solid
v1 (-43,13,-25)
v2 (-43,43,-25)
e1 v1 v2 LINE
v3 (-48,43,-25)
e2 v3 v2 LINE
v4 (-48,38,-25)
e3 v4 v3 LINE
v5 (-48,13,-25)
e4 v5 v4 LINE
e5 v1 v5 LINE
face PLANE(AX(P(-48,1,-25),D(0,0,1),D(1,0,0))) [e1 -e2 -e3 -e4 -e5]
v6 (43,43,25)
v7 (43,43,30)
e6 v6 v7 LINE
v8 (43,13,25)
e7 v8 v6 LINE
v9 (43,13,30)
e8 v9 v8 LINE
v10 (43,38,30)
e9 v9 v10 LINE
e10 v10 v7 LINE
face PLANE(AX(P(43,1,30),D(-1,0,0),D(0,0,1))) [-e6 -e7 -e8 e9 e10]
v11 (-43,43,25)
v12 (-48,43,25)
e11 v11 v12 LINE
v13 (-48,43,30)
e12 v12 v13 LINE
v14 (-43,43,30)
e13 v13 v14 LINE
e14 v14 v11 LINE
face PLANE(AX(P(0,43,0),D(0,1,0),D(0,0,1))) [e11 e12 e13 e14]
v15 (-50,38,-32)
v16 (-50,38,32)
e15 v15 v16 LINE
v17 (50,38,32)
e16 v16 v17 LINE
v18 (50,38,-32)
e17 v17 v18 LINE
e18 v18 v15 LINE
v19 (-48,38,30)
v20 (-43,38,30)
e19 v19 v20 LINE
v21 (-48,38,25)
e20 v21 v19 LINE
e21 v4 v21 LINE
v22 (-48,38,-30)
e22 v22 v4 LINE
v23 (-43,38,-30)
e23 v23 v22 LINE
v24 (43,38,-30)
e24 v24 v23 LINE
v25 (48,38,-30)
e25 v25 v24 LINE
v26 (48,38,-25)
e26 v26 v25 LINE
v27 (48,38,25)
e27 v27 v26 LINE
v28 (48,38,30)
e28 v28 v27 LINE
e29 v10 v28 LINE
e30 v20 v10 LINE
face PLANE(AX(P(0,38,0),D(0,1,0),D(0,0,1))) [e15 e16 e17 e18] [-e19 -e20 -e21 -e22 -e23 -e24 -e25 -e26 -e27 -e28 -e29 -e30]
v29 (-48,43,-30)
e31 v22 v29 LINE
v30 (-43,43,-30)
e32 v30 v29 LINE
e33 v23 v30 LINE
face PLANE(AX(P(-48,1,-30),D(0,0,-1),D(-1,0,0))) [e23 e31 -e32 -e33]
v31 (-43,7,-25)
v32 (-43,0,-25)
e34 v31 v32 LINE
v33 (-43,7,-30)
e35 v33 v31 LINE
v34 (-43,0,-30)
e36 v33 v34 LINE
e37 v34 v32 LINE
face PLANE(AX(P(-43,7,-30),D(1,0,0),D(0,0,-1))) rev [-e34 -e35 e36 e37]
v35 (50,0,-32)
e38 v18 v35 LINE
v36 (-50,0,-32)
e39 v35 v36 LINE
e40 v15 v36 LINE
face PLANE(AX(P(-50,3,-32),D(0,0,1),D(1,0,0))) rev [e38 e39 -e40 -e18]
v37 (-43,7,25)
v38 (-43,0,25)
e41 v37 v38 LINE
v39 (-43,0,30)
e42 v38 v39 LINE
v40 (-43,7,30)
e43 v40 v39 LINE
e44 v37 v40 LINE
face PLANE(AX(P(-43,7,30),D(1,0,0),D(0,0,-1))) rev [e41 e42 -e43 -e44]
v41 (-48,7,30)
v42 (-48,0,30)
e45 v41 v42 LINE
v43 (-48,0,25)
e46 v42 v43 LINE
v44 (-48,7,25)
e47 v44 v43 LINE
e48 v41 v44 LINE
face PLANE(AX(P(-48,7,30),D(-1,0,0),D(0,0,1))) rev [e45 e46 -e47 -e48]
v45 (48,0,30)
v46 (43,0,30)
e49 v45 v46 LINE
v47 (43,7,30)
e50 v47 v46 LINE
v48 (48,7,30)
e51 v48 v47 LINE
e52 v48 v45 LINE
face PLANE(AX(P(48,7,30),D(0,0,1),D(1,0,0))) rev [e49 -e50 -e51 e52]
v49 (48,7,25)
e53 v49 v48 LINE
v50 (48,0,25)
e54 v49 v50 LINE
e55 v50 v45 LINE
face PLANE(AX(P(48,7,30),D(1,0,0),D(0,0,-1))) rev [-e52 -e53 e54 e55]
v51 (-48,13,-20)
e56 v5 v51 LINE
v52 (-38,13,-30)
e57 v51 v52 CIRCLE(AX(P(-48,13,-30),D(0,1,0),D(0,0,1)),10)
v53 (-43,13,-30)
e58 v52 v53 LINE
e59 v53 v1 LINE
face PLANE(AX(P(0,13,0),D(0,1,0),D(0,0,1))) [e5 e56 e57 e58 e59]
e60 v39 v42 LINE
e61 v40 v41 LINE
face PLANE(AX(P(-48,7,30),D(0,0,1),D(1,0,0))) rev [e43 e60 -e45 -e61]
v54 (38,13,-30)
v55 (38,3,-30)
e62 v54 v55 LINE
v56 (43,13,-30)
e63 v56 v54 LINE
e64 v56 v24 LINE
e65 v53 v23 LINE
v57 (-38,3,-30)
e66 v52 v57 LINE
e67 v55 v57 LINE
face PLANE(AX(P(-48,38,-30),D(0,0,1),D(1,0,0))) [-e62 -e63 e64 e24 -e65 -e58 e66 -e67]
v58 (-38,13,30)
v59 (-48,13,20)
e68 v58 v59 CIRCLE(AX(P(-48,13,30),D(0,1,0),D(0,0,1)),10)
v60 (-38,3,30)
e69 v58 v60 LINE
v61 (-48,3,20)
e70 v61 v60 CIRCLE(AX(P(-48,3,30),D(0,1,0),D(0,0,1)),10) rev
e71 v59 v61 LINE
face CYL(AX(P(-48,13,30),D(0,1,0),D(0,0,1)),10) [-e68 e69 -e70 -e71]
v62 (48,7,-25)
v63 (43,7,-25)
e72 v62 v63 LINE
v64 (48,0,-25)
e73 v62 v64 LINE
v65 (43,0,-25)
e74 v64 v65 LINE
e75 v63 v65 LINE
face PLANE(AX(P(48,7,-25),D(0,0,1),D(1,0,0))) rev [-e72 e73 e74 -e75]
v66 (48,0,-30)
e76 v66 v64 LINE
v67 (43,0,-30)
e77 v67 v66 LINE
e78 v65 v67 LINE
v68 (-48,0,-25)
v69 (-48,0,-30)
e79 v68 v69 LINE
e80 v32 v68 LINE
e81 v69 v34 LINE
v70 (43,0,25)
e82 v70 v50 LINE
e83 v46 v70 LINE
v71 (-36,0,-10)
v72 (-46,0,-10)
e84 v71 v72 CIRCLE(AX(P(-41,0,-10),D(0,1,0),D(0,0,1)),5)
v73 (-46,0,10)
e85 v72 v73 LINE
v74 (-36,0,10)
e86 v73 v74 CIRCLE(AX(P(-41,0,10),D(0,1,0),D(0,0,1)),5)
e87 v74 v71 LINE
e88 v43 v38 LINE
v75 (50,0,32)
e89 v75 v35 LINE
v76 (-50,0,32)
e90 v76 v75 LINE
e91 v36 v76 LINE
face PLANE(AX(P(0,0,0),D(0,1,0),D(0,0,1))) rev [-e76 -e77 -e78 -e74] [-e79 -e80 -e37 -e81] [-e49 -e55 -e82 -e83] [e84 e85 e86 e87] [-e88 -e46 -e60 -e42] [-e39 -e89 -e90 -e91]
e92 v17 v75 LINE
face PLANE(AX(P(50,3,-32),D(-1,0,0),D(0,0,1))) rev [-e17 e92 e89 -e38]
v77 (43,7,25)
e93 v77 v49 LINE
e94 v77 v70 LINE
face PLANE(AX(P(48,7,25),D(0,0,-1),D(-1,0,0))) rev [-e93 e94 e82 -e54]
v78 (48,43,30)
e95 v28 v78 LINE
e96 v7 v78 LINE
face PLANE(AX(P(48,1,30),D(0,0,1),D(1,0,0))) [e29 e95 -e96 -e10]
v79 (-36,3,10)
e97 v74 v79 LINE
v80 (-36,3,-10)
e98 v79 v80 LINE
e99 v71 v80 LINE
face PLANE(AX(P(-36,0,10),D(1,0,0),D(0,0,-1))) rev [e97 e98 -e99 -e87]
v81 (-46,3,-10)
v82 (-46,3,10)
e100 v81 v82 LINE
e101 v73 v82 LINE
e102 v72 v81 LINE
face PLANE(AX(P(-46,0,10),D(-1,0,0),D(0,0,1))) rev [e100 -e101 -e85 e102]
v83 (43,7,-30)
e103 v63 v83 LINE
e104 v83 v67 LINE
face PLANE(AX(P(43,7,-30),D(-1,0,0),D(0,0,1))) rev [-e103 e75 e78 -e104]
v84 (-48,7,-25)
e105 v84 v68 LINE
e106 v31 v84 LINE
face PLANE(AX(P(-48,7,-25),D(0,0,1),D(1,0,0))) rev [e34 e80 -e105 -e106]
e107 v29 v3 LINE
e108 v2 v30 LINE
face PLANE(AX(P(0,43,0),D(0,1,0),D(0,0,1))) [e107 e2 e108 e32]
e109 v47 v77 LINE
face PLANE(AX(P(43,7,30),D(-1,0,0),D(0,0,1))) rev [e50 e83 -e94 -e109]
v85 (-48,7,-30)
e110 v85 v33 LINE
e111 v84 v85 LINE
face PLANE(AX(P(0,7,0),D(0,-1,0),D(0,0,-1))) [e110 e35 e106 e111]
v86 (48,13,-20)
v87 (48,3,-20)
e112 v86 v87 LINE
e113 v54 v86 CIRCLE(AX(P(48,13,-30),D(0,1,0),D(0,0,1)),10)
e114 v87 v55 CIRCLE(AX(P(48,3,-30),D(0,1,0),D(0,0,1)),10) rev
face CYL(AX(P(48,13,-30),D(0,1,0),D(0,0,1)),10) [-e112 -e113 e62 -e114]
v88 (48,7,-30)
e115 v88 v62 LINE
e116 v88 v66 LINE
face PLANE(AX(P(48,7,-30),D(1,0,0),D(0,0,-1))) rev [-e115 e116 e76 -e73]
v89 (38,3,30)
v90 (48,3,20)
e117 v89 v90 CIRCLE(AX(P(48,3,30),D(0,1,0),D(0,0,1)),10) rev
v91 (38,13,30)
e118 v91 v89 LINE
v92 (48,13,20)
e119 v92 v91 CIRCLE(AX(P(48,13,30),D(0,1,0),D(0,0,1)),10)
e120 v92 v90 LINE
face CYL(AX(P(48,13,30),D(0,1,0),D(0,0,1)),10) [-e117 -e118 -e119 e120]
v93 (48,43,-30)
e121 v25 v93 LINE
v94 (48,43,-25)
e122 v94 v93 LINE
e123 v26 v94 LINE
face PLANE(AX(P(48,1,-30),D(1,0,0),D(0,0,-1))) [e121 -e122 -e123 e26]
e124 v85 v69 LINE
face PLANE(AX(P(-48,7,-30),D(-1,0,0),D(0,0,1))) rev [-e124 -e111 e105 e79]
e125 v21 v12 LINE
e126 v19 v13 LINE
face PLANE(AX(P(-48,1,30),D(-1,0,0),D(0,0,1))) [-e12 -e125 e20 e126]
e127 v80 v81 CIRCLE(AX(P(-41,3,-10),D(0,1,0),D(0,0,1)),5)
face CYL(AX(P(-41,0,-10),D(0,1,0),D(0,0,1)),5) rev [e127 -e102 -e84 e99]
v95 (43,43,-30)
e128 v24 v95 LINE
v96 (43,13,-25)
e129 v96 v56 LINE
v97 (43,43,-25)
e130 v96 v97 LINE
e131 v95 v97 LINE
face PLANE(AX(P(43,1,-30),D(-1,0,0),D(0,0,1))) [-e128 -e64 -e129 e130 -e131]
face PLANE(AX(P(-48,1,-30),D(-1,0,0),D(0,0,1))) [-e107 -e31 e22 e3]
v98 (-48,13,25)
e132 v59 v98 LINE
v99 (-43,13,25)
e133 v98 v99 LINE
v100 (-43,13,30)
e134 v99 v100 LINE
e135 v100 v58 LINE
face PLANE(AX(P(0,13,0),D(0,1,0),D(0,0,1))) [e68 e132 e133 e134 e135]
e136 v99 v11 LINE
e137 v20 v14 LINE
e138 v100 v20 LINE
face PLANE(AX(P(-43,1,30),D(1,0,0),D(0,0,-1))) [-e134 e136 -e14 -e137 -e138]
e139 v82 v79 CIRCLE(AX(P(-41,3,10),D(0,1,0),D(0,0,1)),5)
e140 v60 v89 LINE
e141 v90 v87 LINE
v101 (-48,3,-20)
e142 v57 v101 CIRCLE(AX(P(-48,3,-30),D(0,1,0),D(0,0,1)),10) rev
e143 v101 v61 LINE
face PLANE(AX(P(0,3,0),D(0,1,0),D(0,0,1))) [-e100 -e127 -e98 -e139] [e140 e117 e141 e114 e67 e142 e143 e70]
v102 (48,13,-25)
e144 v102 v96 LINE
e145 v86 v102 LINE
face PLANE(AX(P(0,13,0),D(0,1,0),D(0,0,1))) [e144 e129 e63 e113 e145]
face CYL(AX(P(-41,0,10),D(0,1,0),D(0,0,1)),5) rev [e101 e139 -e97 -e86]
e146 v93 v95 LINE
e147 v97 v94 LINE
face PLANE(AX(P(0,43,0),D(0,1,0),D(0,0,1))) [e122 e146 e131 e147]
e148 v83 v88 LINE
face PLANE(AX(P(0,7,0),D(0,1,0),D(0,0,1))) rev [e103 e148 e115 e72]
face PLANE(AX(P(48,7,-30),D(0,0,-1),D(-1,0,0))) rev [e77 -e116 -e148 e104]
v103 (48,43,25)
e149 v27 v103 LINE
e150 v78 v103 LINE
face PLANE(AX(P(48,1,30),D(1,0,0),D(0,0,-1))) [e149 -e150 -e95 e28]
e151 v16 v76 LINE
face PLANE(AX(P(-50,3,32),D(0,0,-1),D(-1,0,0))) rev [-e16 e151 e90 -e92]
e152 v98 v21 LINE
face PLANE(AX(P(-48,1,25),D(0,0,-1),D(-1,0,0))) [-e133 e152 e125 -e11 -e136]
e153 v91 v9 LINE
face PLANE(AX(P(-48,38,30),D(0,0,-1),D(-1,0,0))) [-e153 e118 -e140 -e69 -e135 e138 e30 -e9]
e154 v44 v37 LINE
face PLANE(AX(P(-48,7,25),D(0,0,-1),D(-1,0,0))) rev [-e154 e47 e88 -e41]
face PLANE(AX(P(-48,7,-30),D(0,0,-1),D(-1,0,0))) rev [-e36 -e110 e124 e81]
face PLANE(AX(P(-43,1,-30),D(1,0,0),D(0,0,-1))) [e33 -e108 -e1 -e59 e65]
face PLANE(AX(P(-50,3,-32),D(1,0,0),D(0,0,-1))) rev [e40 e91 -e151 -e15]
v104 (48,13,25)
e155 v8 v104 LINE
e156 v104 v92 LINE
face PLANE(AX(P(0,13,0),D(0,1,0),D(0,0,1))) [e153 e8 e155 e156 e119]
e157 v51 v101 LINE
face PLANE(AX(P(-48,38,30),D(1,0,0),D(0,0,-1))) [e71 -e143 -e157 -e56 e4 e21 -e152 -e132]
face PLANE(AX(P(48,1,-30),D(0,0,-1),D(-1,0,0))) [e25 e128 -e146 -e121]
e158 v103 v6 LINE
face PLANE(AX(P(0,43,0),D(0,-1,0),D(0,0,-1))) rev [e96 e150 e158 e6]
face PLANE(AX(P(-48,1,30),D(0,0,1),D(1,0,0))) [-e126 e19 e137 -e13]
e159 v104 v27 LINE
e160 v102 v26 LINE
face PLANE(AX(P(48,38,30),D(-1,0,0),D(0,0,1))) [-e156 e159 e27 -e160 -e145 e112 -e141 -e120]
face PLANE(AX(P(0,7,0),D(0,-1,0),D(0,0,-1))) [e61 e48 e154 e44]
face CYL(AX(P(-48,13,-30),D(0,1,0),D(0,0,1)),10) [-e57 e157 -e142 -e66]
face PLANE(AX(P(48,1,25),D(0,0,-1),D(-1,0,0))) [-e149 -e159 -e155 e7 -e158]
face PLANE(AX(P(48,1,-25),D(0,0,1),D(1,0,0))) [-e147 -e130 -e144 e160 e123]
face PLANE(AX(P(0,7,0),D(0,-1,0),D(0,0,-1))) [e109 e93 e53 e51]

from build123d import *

# Parameters (mm, degrees)
SKETCH1_W                = 100
SKETCH1_H                = 64
BOSS_EXTRUDE1_DEPTH      = 3
SKETCH2_W                = 100
SKETCH2_H                = 64
SKETCH2_W_2              = 96
SKETCH2_H_2              = 60
BOSS_EXTRUDE2_DEPTH      = 35
BOSS_EXTRUDE9_DEPTH      = 5
BOSS_EXTRUDE9_DEPTH_BACK = 37
SKETCH12_W               = 5
SKETCH12_H               = 5
CUT_EXTRUDE6_DEPTH       = 72.582120673
BOSS_EXTRUDE11_DEPTH     = 10
SKETCH19_W               = 5
SKETCH19_H               = 5
CUT_EXTRUDE7_DEPTH       = 7
FILLET2_R                = 10


with BuildPart() as part:
    # Sketch1 → Boss-Extrude1 (new body)
    with BuildSketch(Plane(origin=(0, 0, 0), x_dir=(1, 0, 0), z_dir=(0, 1, 0))):
        Rectangle(SKETCH1_W, SKETCH1_H)
    extrude(amount=BOSS_EXTRUDE1_DEPTH)

    # Sketch2 → Boss-Extrude2 (add)
    with BuildSketch(Plane(origin=(0, 3, 0), x_dir=(1, 0, 0), z_dir=(0, 1, 0))):
        Rectangle(SKETCH2_W, SKETCH2_H)
        Rectangle(SKETCH2_W_2, SKETCH2_H_2, mode=Mode.SUBTRACT)
    extrude(amount=BOSS_EXTRUDE2_DEPTH)

    # Sketch12 → Boss-Extrude9 (add, two sides: drawn at the far end of the back side and taken through both)
    with BuildSketch(Plane(origin=(0, 38, 0), x_dir=(1, 0, 0), z_dir=(0, 1, 0)).offset(-BOSS_EXTRUDE9_DEPTH_BACK)):
        with Locations((-45.5, 27.5)):
            Rectangle(SKETCH12_W, SKETCH12_H)
        with Locations((45.5, 27.5)):
            Rectangle(SKETCH12_W, SKETCH12_H)
        with Locations((45.5, -27.5)):
            Rectangle(SKETCH12_W, SKETCH12_H)
        with Locations((-45.5, -27.5)):
            Rectangle(SKETCH12_W, SKETCH12_H)
    extrude(amount=BOSS_EXTRUDE9_DEPTH + BOSS_EXTRUDE9_DEPTH_BACK)

    # Sketch14 → Cut-Extrude6 (cut, through all)
    with BuildSketch(Plane(origin=(0, 3, 0), x_dir=(1, 0, 0), z_dir=(0, 1, 0))):
        with BuildLine():
            Line((-46, -10), (-46, 10))
            ThreePointArc((-46, 10), (-41, 15), (-36, 10))
            Line((-36, 10), (-36, -10))
            ThreePointArc((-36, -10), (-41, -15), (-46, -10))
        make_face()
    extrude(amount=-CUT_EXTRUDE6_DEPTH, mode=Mode.SUBTRACT)

    # Sketch17 → Boss-Extrude11 (add)
    with BuildSketch(Plane(origin=(0, 3, 0), x_dir=(1, 0, 0), z_dir=(0, 1, 0))):
        Polygon((-38, 30), (-43, 30), (-43, 25), (-48, 25), (-48, 20), (-38, 20), align=None)
        Polygon((43, 30), (38, 30), (38, 20), (48, 20), (48, 25), (43, 25), align=None)
        Polygon((48, -25), (48, -20), (38, -20), (38, -30), (43, -30), (43, -25), align=None)
        Polygon((-38, -20), (-48, -20), (-48, -25), (-43, -25), (-43, -30), (-38, -30), align=None)
    extrude(amount=BOSS_EXTRUDE11_DEPTH)

    # Sketch19 → Cut-Extrude7 (cut)
    with BuildSketch(Plane.XZ):
        with Locations((-45.5, 27.5)):
            Rectangle(SKETCH19_W, SKETCH19_H)
        with Locations((45.5, 27.5)):
            Rectangle(SKETCH19_W, SKETCH19_H)
        with Locations((45.5, -27.5)):
            Rectangle(SKETCH19_W, SKETCH19_H)
        with Locations((-45.5, -27.5)):
            Rectangle(SKETCH19_W, SKETCH19_H)
    extrude(amount=-CUT_EXTRUDE7_DEPTH, mode=Mode.SUBTRACT)

    # Fillet2
    fillet2_edges = [part.edges().sort_by_distance(p)[0] for p in [
        (-38, 8, 20),
        (38, 8, -20),
        (38, 8, 20),
        (-38, 8, -20),
    ]]
    fillet(fillet2_edges, radius=FILLET2_R - 0.0001)  # a hair under: the kernel refuses the full size


solid = part.part
